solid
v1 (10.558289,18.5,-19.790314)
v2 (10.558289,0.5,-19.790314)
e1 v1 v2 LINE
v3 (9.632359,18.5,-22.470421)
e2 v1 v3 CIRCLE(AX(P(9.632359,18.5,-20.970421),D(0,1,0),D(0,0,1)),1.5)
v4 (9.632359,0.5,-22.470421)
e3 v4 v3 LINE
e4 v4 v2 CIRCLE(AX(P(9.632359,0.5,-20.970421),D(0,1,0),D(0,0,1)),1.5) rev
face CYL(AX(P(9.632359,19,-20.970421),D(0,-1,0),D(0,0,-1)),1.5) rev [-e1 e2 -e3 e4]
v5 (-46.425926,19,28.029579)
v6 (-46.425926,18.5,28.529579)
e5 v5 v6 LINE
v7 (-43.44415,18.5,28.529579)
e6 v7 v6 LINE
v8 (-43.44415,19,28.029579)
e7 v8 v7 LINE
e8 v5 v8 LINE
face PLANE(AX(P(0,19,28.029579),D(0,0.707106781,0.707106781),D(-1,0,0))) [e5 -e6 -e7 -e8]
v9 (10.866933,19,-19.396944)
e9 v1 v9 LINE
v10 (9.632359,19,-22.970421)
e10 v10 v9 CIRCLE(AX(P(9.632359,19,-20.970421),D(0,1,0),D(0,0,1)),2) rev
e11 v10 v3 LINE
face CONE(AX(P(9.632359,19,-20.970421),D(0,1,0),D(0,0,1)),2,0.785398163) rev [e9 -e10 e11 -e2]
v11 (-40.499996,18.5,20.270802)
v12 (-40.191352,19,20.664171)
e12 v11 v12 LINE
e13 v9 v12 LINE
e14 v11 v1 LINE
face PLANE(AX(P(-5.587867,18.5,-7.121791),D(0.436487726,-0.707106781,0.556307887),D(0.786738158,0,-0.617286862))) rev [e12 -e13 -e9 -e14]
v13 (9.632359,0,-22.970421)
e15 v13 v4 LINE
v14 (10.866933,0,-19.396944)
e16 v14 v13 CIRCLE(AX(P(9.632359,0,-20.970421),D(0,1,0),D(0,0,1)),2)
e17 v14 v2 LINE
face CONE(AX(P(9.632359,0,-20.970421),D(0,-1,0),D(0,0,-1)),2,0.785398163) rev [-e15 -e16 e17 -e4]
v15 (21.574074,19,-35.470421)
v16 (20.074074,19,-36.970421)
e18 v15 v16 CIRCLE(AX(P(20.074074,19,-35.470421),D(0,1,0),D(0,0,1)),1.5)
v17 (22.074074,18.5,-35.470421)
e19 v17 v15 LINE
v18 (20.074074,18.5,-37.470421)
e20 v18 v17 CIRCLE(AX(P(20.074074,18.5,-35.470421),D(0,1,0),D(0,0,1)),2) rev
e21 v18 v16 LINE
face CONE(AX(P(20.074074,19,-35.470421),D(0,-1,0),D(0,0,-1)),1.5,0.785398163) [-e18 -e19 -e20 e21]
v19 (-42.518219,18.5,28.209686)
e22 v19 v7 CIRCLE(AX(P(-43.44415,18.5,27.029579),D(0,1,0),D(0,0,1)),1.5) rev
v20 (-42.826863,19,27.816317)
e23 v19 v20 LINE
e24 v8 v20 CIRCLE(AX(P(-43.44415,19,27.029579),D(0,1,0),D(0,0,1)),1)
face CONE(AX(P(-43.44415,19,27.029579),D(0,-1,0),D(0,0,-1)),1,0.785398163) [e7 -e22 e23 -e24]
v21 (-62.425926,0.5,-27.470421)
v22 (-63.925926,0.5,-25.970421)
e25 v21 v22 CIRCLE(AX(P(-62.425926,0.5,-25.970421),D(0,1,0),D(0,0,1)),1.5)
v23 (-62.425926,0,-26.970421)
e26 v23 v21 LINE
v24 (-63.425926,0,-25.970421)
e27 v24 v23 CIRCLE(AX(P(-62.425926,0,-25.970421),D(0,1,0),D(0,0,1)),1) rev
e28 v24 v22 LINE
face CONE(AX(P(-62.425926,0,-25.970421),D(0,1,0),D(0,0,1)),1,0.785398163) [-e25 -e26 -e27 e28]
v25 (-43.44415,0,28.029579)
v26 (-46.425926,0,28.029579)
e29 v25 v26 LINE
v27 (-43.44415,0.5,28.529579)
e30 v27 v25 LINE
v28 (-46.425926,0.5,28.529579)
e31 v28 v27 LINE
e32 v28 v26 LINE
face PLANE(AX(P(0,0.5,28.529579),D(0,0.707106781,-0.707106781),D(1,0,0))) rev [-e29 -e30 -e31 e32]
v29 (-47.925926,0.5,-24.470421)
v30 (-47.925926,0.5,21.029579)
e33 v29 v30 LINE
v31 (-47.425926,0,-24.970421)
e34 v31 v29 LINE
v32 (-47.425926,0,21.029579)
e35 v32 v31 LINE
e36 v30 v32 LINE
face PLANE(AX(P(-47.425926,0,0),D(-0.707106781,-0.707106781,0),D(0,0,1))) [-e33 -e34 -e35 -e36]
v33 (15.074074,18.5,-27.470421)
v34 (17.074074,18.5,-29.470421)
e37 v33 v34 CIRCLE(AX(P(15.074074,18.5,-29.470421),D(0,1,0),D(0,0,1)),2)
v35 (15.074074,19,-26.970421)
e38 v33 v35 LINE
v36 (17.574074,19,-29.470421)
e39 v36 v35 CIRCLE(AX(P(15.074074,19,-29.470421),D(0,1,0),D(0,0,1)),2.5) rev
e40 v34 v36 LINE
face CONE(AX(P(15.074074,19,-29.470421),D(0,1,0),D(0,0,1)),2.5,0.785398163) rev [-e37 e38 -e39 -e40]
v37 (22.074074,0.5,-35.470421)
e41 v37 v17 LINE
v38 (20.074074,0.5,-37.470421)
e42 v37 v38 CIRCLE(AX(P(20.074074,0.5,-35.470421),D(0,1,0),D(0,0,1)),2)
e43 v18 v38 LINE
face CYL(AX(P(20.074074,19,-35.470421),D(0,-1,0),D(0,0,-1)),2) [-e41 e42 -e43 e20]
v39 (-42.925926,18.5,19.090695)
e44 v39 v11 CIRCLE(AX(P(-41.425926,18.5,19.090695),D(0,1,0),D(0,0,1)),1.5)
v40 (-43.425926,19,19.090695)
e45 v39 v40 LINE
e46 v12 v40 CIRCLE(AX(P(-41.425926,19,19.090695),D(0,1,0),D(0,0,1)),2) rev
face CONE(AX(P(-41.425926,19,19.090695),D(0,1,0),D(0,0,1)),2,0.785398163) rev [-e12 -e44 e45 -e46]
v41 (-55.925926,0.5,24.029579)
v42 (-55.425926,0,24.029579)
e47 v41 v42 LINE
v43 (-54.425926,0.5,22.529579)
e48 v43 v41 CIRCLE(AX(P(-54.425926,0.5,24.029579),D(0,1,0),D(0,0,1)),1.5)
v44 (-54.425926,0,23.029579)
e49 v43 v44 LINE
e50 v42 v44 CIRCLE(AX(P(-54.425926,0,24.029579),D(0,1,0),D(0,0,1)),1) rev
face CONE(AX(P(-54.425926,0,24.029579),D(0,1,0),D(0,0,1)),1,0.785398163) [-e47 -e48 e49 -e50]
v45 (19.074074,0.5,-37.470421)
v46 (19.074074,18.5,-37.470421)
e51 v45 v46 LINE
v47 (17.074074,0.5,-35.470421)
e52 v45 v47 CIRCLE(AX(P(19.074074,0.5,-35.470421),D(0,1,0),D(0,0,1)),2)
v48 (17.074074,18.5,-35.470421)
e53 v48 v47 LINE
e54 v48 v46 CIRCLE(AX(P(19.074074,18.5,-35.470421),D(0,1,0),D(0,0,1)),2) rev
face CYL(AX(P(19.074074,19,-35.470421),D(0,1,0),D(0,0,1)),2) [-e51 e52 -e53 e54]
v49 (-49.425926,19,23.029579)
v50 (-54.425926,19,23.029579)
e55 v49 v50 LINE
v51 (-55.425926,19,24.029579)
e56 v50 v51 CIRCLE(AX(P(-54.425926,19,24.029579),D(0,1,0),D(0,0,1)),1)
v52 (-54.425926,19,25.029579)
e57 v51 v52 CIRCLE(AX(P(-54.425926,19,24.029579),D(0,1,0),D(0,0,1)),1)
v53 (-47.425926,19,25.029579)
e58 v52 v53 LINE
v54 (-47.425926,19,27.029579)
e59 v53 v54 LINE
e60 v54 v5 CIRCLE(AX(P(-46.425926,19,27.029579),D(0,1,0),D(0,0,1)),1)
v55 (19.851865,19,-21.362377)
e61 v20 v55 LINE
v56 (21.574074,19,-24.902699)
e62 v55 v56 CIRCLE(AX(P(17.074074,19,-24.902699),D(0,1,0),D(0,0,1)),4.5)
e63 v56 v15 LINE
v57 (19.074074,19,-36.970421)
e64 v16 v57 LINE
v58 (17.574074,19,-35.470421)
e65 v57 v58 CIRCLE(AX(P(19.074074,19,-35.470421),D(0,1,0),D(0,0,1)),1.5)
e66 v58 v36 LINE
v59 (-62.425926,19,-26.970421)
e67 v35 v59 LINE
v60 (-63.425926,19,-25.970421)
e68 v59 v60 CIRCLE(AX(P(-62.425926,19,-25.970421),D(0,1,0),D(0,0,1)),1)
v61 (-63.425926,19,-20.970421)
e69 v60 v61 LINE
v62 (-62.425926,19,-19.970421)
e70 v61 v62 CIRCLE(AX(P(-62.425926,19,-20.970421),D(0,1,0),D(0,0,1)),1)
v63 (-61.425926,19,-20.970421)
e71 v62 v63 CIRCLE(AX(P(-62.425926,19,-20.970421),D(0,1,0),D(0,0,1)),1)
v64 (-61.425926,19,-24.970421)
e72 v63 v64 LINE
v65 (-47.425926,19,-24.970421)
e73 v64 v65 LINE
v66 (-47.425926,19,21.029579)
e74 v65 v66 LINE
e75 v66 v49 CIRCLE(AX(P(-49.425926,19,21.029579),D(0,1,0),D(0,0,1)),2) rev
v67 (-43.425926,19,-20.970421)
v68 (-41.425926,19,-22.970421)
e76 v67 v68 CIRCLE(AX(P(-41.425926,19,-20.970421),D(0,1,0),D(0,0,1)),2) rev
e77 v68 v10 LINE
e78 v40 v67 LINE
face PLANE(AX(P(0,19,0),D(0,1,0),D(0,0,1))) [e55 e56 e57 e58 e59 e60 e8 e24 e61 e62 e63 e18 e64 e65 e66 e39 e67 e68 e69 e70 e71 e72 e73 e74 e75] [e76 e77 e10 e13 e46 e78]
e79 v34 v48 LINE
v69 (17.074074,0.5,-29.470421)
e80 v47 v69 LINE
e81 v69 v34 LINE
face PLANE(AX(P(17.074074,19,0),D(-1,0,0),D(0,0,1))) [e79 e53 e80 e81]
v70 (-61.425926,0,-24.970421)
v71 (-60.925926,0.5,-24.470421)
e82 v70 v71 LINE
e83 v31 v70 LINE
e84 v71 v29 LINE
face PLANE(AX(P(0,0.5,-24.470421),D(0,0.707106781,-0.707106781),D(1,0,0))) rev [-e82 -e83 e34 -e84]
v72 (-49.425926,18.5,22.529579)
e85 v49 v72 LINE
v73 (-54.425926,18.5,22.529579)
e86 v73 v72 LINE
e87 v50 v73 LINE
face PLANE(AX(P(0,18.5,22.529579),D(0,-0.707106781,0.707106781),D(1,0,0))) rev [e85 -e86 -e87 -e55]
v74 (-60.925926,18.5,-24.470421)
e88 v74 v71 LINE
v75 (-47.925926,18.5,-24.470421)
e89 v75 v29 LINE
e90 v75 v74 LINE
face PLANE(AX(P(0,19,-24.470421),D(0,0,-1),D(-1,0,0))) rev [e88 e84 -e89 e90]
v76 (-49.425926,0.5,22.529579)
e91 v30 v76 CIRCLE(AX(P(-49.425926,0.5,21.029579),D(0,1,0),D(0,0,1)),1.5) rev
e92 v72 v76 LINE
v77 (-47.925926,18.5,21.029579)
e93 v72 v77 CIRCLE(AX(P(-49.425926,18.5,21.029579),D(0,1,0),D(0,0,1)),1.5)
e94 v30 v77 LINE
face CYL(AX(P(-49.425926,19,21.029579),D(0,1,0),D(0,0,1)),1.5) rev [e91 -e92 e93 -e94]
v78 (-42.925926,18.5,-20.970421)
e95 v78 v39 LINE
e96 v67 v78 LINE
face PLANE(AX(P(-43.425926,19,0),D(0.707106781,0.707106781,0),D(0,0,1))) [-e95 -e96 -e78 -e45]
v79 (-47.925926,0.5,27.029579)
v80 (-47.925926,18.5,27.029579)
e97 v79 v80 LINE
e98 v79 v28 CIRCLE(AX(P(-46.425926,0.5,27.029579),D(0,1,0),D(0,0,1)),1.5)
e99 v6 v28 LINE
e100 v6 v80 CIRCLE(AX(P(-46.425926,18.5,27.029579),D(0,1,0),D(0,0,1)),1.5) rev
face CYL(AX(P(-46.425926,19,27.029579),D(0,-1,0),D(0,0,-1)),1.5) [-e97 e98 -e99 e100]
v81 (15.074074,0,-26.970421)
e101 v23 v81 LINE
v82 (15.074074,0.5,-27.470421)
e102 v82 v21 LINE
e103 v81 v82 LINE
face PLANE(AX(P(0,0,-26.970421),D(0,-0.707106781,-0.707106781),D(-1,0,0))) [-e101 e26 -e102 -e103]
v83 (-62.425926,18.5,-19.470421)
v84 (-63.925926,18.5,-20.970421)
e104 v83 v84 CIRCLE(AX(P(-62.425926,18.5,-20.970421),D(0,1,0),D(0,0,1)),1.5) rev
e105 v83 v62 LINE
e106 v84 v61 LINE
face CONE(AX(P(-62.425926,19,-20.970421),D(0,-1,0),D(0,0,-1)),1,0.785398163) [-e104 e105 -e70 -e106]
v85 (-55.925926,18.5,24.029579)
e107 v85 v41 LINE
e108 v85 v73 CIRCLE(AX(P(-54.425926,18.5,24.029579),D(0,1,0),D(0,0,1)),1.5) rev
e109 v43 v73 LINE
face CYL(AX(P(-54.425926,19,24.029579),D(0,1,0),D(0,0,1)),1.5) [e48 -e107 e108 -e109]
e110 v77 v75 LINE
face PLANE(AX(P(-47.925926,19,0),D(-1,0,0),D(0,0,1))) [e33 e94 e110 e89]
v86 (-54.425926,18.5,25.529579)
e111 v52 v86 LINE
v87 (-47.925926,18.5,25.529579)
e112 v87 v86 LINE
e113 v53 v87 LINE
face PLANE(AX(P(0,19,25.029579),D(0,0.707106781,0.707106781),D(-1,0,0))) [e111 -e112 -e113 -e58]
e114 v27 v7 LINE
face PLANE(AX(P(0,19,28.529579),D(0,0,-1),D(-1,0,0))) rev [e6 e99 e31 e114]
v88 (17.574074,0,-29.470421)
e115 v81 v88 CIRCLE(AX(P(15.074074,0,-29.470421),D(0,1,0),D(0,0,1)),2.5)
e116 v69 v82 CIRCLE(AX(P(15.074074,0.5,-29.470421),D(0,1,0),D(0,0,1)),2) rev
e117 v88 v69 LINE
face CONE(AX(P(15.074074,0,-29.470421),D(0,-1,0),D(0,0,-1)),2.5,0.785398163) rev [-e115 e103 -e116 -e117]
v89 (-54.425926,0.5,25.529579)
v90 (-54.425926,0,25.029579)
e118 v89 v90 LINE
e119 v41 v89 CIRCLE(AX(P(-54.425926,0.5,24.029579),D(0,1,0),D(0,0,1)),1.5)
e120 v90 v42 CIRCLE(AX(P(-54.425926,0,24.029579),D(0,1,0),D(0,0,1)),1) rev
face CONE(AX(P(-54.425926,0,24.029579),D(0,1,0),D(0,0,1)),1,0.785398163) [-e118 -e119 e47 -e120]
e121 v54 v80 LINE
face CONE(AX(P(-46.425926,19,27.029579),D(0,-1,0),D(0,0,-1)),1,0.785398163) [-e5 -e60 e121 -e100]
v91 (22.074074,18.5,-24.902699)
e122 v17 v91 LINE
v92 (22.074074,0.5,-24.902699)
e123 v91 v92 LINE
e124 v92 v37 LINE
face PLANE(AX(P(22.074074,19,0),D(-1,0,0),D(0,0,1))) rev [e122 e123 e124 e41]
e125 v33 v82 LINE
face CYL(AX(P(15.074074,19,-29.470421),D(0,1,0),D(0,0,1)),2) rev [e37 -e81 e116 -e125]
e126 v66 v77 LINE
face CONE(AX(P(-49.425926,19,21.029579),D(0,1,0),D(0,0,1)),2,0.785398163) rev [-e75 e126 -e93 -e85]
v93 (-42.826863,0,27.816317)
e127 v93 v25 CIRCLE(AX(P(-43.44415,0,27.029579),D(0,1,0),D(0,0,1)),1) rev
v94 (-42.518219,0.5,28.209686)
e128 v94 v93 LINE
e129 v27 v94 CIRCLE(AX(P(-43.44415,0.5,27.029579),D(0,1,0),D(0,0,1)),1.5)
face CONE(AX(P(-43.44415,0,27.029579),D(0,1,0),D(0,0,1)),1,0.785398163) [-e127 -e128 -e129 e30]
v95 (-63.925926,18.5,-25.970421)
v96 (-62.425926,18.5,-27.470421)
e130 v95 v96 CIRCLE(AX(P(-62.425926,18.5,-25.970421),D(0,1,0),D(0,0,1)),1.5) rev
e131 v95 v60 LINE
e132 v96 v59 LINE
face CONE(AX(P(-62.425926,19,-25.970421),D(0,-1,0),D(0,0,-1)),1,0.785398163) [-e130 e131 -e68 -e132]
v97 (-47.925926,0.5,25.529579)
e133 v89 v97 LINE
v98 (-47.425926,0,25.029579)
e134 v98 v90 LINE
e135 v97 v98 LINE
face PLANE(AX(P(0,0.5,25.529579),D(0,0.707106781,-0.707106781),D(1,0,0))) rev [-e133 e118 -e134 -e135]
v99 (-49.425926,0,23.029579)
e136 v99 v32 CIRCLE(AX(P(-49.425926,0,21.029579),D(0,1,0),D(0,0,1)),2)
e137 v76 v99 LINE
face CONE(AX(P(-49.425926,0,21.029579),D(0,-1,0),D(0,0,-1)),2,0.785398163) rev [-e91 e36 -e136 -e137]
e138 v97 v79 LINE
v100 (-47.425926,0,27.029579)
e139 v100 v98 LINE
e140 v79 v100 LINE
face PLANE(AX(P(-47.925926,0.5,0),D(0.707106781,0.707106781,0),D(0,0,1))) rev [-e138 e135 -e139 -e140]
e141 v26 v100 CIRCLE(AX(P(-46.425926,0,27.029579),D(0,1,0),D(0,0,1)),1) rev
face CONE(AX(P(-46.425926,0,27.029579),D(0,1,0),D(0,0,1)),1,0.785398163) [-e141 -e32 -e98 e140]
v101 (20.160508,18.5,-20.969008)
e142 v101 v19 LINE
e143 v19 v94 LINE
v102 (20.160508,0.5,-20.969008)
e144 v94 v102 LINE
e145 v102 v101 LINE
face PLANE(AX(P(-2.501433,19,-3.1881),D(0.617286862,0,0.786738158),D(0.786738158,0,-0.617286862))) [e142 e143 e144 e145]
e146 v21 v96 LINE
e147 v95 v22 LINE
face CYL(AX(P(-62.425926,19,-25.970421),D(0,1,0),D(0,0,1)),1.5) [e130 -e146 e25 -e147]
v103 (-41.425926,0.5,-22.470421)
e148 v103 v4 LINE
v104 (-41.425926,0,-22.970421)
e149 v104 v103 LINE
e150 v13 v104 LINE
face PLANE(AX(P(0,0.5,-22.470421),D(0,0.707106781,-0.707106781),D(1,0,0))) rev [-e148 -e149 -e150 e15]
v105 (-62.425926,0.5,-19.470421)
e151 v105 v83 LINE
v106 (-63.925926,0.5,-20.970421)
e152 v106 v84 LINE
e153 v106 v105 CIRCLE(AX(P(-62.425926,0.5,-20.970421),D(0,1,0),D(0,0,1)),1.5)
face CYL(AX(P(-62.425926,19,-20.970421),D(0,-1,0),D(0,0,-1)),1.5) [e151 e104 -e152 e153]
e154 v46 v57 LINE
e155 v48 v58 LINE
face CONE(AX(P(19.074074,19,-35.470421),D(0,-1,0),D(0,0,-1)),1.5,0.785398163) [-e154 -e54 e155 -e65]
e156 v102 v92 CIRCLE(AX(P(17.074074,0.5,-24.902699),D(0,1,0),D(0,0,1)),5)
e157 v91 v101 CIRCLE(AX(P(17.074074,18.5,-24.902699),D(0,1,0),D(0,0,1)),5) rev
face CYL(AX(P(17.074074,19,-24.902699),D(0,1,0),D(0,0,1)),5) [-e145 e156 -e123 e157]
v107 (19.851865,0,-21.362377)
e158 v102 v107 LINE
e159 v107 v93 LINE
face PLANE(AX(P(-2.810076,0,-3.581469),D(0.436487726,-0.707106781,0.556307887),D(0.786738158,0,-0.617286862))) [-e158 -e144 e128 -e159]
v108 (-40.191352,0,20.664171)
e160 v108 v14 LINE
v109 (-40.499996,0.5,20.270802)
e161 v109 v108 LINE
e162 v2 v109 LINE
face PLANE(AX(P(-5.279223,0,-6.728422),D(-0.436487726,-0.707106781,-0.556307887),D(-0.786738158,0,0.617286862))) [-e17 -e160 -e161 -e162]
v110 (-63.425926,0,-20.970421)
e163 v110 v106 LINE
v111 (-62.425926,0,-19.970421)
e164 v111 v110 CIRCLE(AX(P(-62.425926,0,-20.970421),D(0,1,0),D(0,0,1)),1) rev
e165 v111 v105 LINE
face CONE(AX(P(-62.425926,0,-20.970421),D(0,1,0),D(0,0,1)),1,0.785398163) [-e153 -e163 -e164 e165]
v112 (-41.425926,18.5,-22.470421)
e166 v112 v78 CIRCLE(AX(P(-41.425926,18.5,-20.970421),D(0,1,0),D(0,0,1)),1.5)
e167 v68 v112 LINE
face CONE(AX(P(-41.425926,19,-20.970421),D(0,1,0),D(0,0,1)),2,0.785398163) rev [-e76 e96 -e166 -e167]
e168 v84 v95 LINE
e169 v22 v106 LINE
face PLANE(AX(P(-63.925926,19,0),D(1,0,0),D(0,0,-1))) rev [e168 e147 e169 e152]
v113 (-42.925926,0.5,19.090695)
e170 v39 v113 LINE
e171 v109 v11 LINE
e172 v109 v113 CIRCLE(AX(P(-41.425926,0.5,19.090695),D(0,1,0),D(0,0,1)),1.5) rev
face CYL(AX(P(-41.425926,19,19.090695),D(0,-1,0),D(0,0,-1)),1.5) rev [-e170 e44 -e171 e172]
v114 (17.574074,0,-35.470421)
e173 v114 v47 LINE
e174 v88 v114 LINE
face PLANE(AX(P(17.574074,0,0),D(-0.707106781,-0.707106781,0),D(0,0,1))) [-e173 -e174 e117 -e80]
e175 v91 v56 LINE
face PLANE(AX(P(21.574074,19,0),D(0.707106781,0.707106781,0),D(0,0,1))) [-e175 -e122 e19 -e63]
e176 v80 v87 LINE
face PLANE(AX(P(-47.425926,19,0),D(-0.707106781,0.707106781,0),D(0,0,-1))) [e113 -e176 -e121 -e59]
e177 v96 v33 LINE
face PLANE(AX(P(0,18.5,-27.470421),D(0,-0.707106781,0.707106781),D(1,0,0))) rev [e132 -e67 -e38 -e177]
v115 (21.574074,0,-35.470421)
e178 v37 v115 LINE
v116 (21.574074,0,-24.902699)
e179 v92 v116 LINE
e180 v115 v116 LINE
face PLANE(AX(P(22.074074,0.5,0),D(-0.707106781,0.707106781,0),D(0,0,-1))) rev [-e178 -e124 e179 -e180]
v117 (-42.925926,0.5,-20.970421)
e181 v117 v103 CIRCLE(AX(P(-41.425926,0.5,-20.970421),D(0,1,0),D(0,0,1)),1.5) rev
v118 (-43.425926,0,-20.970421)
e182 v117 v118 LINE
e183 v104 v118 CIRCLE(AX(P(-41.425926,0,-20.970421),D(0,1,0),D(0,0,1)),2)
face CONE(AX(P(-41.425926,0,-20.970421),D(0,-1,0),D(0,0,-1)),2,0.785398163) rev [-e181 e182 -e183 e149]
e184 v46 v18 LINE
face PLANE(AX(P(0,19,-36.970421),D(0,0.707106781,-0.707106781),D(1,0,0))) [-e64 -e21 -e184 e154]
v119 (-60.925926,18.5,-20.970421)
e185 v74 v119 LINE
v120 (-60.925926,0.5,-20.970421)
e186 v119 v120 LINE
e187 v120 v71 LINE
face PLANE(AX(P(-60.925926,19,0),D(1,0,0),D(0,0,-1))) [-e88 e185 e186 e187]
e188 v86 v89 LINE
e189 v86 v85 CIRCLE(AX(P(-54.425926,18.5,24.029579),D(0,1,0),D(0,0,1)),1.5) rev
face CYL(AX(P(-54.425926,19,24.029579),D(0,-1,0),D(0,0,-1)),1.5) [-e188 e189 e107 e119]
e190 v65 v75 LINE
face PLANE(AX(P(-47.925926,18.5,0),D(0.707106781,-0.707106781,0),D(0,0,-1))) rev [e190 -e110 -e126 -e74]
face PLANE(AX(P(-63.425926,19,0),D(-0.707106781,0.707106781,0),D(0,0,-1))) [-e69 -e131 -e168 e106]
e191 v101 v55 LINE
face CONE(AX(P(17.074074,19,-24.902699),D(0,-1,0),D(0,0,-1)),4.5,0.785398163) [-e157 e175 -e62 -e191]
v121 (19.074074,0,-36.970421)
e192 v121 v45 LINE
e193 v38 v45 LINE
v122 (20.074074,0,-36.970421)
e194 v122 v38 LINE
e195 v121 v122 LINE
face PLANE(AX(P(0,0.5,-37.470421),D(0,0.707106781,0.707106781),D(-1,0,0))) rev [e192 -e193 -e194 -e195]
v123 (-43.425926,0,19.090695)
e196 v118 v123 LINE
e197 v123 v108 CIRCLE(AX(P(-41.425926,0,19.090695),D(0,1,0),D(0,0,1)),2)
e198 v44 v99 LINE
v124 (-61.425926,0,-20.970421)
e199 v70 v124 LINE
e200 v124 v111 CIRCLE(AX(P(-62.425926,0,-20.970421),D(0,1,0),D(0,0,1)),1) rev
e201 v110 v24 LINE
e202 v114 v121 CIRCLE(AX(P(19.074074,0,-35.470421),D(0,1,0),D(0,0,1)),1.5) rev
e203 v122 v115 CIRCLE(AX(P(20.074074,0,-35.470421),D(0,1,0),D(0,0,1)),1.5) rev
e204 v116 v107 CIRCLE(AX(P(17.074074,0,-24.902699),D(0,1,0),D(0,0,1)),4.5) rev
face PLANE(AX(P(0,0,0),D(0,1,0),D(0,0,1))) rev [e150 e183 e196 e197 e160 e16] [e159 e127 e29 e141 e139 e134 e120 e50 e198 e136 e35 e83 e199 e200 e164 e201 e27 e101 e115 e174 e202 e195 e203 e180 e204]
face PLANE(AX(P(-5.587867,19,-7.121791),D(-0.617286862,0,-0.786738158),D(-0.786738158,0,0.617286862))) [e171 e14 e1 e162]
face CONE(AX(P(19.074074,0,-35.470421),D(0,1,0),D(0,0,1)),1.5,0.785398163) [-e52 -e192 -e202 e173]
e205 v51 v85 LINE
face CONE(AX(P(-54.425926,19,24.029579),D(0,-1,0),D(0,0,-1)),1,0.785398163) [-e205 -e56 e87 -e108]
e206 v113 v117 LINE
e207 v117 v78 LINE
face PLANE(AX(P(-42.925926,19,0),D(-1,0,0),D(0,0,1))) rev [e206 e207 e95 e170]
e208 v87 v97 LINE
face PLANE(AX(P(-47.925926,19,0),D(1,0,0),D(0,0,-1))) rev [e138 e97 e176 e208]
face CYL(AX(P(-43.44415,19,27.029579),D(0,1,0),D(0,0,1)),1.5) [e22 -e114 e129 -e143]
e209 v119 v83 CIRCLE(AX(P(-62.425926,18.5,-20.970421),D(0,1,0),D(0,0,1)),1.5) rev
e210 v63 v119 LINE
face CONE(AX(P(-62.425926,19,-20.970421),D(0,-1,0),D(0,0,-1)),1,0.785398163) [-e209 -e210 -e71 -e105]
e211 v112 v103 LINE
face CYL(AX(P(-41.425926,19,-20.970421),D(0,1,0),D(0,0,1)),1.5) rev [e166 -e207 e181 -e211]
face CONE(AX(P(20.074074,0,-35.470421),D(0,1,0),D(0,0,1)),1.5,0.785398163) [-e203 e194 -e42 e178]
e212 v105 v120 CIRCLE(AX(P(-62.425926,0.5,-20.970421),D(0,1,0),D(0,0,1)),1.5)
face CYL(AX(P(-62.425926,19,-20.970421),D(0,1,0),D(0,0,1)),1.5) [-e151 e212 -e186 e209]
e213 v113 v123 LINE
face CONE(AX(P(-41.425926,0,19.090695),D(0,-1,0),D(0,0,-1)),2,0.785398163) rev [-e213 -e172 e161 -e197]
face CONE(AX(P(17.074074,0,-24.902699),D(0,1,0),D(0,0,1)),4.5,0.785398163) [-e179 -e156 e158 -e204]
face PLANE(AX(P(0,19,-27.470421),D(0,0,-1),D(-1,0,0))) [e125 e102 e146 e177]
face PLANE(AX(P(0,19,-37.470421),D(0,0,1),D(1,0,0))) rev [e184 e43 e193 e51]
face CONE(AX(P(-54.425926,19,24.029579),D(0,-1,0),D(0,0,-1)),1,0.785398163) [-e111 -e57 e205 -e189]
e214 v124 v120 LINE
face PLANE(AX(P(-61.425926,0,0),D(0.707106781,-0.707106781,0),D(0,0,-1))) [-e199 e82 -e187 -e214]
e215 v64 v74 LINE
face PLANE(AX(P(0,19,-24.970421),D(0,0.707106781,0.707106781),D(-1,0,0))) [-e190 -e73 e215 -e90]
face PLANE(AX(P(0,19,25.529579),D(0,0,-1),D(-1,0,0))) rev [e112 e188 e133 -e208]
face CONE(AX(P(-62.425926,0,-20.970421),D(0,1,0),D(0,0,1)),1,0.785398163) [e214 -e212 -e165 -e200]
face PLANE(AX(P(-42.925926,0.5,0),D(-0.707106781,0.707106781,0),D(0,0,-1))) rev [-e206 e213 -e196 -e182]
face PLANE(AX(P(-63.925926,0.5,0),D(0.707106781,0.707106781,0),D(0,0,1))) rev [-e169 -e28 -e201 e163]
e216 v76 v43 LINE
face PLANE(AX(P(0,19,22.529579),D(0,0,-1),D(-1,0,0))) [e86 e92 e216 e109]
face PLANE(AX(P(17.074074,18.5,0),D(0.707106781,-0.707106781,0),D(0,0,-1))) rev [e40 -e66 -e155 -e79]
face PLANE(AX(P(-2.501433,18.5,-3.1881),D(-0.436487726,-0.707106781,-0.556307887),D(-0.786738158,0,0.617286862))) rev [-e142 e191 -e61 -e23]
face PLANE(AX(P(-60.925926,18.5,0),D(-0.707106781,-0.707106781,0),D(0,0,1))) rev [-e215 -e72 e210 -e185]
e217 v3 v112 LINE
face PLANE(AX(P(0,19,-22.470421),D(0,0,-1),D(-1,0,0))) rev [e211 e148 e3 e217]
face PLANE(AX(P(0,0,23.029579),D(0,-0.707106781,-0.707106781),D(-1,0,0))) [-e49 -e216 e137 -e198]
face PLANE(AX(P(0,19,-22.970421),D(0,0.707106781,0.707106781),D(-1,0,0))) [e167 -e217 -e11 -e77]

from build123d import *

# Parameters (mm, degrees)
BOSS_EXTRUDE1_DEPTH = 19
FILLET1_R           = 1.5
FILLET2_R           = 2
FILLET3_R           = 5
CHAMFER1_SIZE       = 0.5


with BuildPart() as part:
    # Sketch1 → Boss-Extrude1 (new body)
    with BuildSketch(Plane(origin=(0, 0, 0), x_dir=(1, 0, 0), z_dir=(0, 1, 0))):
        Polygon((-47.925925926, 24.470420803), (-47.925925926, -7.529579197), (-47.925925926, -22.529579197), (-55.925925926, -22.529579197), (-55.925925926, -25.529579197), (-47.925925926, -25.529579197), (-47.925925926, -28.529579197), (-42.925925926, -28.529579197), (22.074074074, 22.470420803), (22.074074074, 24.470420803), (22.074074074, 27.470420803), (22.074074074, 37.470420803), (17.074074074, 37.470420803), (17.074074074, 27.470420803), (-42.925925926, 27.470420803), (-47.925925926, 27.470420803), (-63.925925926, 27.470420803), (-63.925925926, 24.470420803), (-63.925925926, 19.470420803), (-60.925925926, 19.470420803), (-60.925925926, 24.470420803), align=None)
        Polygon((13.974112284, 22.470420803), (-13.512360238, 0.904111593), (-42.925925926, -22.174224561), (-42.925925926, 22.470420803), align=None, mode=Mode.SUBTRACT)
    extrude(amount=BOSS_EXTRUDE1_DEPTH)

    # Fillet1
    fillet1_edges = [part.edges().sort_by_distance(p)[0] for p in [
        (13.974112284, 9.5, -22.470420803),
        (-42.925925926, 9.5, -22.470420803),
        (-42.925925926, 9.5, 22.174224561),
        (-47.925925926, 9.5, 28.529579197),
        (-55.925925926, 9.5, 25.529579197),
        (-55.925925926, 9.5, 22.529579197),
        (-47.925925926, 9.5, 22.529579197),
        (-63.925925926, 9.5, -27.470420803),
        (-63.925925926, 9.5, -19.470420803),
        (-60.925925926, 9.5, -19.470420803),
        (-42.925925926, 9.5, 28.529579197),
    ]]
    fillet(fillet1_edges, radius=FILLET1_R - 0.0001)  # a hair under: the kernel refuses the full size

    # Fillet2
    fillet2_edges = [part.edges().sort_by_distance(p)[0] for p in [
        (17.074074074, 9.5, -37.470420803),
        (22.074074074, 9.5, -37.470420803),
        (17.074074074, 9.5, -27.470420803),
    ]]
    fillet(fillet2_edges, radius=FILLET2_R)

    # Fillet3
    fillet3_edges = [part.edges().sort_by_distance(p)[0] for p in [
        (22.074074074, 9.5, -22.470420803),
    ]]
    fillet(fillet3_edges, radius=FILLET3_R)

    # Chamfer1
    chamfer1_edges = [part.edges().sort_by_distance(p)[0] for p in [
        (19.574074074, 0, -37.470420803),
        (19.574074074, 19, -37.470420803),
        (17.074074074, 0, -32.470420803),
        (17.659860512, 0, -36.884634365),
        (21.488287636, 0, -36.884634365),
        (17.074074074, 19, -32.470420803),
        (17.659860512, 19, -36.884634365),
        (21.488287636, 19, -36.884634365),
        (16.488287636, 0, -28.056207241),
        (16.488287636, 19, -28.056207241),
        (22.074074074, 0, -30.186559659),
        (22.074074074, 19, -30.186559659),
        (-11.178869129, 0, 3.620350018),
        (21.570304248, 0, -22.715482427),
        (-11.178869129, 19, 3.620350018),
        (21.570304248, 19, -22.715482427),
        (-47.925925926, 0, 26.279629197),
        (-54.425925926, 0, -24.470420803),
        (-60.925925926, 0, -22.720370803),
        (-60.925925926, 19, -22.720370803),
        (-54.425925926, 19, -24.470420803),
        (-44.935070567, 0, 28.529579197),
        (-47.925925926, 19, 26.279629197),
        (-51.175975926, 0, 25.529579197),
        (-51.925925926, 0, 22.529579197),
        (-47.925925926, 0, -1.720370803),
        (-63.925925926, 0, -23.470420803),
        (-23.675975926, 0, -27.470420803),
        (-42.925925926, 0, -0.93981007),
        (-14.970820153, 0, 0.240218493),
        (-15.896688718, 0, -22.470420803),
        (-61.365236465, 0, -19.909731342),
        (-63.486615387, 0, -19.909731342),
        (-63.486615387, 0, -27.031110264),
        (-55.486615387, 0, 22.968889736),
        (-55.486615387, 0, 25.090268658),
        (-47.486615387, 0, 28.090268658),
        (-42.954332008, 0, 28.447357731),
        (-44.935070567, 19, 28.529579197),
        (-23.675975926, 19, -27.470420803),
        (-63.925925926, 19, -23.470420803),
        (-47.925925926, 19, -1.720370803),
        (-51.925925926, 19, 22.529579197),
        (-51.175975926, 19, 25.529579197),
        (-42.925925926, 19, -0.93981007),
        (-15.896688718, 19, -22.470420803),
        (-14.970820153, 19, 0.240218493),
        (-61.365236465, 19, -19.909731342),
        (-63.486615387, 19, -19.909731342),
        (-63.486615387, 19, -27.031110264),
        (-55.486615387, 19, 22.968889736),
        (-55.486615387, 19, 25.090268658),
        (-47.486615387, 19, 28.090268658),
        (-42.954332008, 19, 28.447357731),
        (11.050327025, 0, -21.460304004),
        (11.050327025, 19, -21.460304004),
        (-42.486615387, 0, -22.031110264),
        (-42.486615387, 19, -22.031110264),
        (-42.082147008, 0, 20.43967979),
        (-42.082147008, 19, 20.43967979),
        (-48.365236465, 0, 22.090268658),
        (-48.365236465, 19, 22.090268658),
    ]]
    chamfer(chamfer1_edges, length=CHAMFER1_SIZE)


solid = part.part
